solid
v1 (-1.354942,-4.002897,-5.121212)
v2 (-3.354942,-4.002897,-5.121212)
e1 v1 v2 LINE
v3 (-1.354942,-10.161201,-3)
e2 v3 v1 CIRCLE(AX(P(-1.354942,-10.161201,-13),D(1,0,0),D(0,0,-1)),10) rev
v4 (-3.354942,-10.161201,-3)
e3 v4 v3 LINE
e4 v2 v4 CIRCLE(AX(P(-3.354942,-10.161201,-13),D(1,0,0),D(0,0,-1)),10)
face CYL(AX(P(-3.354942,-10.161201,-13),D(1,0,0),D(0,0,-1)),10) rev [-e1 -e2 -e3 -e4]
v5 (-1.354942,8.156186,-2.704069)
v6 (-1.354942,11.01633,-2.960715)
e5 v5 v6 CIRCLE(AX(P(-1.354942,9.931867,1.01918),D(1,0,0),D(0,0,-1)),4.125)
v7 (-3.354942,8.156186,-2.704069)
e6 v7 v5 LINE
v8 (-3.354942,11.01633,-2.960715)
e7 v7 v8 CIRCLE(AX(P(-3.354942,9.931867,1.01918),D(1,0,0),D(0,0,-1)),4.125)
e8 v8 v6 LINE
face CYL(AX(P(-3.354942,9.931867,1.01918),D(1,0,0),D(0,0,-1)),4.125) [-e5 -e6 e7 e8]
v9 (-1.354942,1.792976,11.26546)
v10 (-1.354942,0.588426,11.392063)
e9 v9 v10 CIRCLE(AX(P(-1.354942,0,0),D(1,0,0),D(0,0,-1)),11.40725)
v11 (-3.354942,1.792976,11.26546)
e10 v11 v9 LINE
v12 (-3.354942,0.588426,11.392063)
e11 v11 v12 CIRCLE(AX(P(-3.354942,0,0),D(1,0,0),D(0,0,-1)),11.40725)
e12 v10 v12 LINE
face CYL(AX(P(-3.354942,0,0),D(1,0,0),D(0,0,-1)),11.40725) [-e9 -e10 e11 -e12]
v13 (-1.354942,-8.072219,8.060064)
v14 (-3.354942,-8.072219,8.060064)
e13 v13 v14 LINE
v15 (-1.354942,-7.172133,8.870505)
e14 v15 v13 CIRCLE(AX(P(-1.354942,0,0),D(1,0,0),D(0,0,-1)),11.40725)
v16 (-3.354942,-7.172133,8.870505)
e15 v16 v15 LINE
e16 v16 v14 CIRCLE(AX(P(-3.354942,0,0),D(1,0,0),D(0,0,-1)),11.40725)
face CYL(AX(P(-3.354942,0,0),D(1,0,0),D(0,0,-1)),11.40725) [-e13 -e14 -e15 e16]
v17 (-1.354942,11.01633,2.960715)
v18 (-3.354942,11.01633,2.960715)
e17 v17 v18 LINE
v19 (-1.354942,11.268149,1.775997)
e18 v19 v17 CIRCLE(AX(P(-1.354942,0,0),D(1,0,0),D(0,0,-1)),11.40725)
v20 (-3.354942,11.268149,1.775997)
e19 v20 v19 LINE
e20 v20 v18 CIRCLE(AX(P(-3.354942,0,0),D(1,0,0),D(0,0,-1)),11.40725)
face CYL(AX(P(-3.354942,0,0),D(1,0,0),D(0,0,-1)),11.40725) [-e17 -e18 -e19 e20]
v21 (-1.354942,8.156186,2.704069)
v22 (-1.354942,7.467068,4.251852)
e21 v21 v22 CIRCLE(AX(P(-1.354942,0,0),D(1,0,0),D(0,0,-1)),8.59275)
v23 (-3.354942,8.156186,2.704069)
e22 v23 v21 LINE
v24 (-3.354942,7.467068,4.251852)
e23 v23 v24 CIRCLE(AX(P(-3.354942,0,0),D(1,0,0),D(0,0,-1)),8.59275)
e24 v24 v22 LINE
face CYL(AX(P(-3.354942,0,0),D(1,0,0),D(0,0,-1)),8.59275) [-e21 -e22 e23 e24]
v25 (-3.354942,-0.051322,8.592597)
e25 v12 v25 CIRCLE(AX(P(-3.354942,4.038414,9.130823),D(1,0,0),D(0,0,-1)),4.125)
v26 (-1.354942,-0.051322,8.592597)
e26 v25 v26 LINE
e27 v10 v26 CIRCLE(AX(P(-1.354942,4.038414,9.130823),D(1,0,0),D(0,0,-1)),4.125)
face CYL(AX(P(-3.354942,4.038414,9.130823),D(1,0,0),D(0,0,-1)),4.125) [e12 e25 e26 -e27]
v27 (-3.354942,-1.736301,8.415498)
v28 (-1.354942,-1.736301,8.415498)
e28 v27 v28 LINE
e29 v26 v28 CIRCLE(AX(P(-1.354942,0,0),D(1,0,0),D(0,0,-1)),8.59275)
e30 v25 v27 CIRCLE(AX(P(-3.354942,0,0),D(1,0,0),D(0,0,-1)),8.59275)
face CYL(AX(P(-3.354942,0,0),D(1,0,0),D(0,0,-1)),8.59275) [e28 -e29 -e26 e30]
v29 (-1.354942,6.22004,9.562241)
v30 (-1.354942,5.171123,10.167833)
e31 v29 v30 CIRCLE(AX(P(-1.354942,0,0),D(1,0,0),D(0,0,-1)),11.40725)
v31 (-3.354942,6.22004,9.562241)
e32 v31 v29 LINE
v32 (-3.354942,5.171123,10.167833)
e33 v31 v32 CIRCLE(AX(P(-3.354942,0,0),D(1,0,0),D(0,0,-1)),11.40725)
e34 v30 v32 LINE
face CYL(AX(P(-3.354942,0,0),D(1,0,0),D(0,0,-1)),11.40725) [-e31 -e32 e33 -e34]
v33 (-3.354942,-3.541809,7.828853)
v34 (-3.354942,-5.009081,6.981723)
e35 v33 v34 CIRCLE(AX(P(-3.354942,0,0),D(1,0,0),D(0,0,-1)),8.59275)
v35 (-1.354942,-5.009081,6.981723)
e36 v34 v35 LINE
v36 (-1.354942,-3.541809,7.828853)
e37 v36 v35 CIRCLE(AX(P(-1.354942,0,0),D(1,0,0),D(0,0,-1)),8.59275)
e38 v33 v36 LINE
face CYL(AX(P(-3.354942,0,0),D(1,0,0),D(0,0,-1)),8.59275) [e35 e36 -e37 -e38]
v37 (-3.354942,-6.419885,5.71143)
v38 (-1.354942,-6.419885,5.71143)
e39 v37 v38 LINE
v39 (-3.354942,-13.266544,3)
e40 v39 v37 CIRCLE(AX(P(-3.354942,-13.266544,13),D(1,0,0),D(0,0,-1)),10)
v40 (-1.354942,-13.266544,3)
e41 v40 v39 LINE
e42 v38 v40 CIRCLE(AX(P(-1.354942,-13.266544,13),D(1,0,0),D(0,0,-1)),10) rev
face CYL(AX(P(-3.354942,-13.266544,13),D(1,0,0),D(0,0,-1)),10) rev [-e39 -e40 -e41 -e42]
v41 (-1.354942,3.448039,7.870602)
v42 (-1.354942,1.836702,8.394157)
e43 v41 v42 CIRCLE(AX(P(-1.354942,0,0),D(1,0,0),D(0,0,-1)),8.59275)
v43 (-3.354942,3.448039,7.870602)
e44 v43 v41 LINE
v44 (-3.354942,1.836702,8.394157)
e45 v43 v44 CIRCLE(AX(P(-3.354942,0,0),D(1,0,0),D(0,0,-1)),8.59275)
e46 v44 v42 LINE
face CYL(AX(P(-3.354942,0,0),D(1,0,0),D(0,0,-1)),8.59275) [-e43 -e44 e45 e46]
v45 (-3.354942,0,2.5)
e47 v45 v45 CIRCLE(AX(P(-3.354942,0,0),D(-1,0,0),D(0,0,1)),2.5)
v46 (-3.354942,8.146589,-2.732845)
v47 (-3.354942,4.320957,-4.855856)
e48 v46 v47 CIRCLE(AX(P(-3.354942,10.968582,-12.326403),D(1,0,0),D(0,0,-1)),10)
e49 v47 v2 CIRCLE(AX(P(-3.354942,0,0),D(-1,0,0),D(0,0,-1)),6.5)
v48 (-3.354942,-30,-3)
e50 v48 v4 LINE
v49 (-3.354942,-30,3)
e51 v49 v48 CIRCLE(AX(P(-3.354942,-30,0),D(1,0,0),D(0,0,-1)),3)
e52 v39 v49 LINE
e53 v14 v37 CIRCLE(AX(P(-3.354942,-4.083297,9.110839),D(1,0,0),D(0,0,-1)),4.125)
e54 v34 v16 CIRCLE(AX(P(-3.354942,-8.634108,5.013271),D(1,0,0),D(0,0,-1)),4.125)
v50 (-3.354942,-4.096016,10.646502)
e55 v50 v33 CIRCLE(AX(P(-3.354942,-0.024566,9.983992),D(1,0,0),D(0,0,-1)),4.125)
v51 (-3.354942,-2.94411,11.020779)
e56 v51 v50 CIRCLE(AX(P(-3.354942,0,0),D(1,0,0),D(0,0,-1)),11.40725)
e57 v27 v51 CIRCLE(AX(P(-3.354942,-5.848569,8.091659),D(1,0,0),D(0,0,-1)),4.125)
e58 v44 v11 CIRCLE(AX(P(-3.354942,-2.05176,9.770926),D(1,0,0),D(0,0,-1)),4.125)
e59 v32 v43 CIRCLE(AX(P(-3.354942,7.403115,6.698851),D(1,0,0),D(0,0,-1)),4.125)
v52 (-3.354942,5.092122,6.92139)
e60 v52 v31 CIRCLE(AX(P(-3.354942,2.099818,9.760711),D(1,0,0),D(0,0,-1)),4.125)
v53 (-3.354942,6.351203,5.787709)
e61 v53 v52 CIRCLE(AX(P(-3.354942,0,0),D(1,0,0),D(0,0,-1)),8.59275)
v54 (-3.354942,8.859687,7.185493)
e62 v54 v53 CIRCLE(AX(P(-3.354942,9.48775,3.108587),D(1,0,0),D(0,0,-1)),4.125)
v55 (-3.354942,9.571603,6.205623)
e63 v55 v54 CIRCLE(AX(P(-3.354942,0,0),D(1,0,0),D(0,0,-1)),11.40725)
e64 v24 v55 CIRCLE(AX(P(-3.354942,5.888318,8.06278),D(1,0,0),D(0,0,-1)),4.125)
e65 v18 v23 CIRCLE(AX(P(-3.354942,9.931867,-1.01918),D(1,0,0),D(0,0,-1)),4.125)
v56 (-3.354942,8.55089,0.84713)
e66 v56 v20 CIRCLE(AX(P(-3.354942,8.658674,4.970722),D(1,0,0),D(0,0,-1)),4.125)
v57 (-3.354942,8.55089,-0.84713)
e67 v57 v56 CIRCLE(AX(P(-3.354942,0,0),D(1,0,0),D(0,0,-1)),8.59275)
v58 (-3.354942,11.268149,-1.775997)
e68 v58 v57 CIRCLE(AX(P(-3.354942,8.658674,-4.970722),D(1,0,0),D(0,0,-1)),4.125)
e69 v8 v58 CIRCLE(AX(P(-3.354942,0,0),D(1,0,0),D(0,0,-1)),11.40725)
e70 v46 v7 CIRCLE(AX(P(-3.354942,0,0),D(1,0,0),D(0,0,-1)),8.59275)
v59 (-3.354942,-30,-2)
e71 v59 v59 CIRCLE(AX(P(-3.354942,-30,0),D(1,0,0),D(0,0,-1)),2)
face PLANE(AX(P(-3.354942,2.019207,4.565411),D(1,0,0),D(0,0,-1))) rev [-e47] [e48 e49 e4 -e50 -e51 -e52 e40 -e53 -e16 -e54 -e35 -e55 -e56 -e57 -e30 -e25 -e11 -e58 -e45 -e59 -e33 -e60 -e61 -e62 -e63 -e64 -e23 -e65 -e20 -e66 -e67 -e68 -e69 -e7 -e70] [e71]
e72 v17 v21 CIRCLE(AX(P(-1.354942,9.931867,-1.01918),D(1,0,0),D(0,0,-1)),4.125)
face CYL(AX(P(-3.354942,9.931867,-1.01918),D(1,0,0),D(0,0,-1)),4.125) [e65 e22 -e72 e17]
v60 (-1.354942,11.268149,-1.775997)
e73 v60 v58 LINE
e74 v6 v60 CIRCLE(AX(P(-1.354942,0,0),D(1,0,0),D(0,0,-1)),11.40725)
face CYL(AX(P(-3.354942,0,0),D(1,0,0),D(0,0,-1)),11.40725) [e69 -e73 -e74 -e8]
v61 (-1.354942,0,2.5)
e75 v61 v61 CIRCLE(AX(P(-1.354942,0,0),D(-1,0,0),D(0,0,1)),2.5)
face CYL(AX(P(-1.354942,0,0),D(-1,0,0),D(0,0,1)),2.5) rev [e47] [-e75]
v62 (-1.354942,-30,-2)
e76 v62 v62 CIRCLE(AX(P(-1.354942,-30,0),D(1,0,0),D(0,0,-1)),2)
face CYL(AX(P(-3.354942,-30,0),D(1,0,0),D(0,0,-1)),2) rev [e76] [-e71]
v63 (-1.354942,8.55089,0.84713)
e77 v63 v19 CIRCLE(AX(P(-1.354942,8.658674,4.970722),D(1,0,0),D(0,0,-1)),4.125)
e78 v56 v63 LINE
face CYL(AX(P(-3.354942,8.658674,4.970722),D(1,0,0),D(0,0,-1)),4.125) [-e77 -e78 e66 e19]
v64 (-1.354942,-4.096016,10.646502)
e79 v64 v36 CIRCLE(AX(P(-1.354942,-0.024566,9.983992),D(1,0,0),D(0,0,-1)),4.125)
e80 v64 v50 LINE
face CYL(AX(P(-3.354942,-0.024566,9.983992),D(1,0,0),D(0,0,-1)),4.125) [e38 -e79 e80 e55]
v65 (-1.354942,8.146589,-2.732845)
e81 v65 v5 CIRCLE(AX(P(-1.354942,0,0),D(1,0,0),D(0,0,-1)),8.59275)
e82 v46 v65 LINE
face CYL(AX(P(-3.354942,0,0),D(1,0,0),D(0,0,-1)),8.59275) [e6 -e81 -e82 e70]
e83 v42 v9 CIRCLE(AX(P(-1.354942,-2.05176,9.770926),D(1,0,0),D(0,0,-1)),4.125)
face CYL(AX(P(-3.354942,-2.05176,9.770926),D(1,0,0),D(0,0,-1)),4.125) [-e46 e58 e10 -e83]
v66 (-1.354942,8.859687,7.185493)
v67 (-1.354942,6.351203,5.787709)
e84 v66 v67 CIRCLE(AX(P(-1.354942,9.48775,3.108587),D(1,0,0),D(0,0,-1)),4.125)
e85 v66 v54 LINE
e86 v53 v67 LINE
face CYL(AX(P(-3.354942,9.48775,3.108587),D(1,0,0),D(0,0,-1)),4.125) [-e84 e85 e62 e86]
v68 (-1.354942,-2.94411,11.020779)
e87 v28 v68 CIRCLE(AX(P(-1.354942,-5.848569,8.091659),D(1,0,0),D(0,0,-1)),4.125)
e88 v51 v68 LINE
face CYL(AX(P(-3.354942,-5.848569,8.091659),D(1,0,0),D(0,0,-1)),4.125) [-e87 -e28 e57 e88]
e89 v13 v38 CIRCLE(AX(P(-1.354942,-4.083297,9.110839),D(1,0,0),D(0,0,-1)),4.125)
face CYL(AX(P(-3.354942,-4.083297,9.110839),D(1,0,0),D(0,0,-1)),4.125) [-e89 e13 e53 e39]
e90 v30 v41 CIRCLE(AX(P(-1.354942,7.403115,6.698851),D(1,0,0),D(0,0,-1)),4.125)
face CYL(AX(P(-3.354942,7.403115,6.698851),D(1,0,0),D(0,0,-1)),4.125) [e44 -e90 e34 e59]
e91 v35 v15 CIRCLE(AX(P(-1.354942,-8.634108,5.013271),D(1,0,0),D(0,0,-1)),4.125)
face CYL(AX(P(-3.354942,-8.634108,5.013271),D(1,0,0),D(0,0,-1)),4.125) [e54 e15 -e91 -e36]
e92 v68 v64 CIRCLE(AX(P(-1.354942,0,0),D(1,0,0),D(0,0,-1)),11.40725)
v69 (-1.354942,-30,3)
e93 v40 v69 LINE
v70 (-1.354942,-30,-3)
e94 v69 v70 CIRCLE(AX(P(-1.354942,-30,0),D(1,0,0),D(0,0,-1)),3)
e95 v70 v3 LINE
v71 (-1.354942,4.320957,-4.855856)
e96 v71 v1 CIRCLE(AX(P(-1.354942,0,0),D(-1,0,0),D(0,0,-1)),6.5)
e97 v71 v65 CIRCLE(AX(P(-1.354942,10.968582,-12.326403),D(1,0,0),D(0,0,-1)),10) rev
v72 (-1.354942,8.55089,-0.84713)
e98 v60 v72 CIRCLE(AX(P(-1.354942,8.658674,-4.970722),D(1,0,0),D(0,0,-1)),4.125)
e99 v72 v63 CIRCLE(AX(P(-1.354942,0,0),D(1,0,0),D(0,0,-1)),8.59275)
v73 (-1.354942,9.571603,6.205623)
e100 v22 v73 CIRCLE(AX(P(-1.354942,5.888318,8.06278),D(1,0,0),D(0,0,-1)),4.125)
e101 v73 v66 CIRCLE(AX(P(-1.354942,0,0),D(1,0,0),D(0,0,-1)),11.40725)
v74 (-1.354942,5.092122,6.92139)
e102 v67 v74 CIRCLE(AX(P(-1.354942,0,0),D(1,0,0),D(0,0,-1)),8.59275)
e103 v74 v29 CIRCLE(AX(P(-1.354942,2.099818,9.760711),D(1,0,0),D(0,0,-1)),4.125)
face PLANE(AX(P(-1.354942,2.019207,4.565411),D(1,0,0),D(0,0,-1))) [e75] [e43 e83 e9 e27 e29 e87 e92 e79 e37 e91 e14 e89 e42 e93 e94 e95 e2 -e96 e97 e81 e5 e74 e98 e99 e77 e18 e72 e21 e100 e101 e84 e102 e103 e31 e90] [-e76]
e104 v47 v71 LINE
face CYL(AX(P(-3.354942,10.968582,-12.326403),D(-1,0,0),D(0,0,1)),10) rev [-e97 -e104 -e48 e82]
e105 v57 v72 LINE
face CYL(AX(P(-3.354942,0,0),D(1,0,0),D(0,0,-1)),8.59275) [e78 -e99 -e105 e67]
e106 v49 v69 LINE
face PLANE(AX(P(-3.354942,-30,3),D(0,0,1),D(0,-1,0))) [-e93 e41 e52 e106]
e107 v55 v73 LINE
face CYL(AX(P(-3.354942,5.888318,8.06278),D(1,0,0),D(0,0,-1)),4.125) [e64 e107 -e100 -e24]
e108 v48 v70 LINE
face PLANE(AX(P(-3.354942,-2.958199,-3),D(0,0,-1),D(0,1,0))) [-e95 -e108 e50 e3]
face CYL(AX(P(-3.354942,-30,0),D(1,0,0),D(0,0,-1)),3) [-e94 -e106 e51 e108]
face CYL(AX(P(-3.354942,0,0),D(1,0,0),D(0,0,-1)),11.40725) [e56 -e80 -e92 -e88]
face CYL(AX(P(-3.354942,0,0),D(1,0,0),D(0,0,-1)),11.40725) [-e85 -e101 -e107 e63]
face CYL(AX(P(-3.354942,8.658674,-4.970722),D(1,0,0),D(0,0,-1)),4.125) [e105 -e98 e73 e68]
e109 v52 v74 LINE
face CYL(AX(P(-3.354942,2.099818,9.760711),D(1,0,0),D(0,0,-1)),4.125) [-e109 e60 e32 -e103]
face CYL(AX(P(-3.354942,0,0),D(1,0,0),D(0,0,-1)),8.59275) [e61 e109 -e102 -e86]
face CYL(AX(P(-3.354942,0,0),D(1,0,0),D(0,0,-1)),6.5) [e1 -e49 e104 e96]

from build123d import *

# Parameters (mm, degrees)
SKETCH1_R           = 1.5
BOSS_EXTRUDE1_DEPTH = 2
SKETCH3_OUTSIDE_W   = 31.914
SKETCH3_OUTSIDE_H   = 31.796
SKETCH3_OUTSIDE_R   = 11.40725
CUT_EXTRUDE1_DEPTH  = 17.630863493
SKETCH4_R           = 2.5
CUT_EXTRUDE2_DEPTH  = 17.245136509
SKETCH5_R           = 2
BOSS_EXTRUDE2_DEPTH = 2
CUT_EXTRUDE3_DEPTH  = 35.968258573
CUT_EXTRUDE4_DEPTH  = 35.968258573
FILLET1_R           = 10


with BuildPart() as part:
    # Sketch1 → Boss-Extrude1 (new body)
    with BuildSketch(Plane(origin=(-1.354941904, 0, 0), x_dir=(0, 0, -1), z_dir=(1, 0, 0))):
        with BuildLine():
            ThreePointArc((-11.66138775, 0.780827758), (-10.210393031, 0.057188521), (-8.592596732, -0.051322118))
            ThreePointArc((-8.592596732, -0.051322118), (-8.545678016, -0.898186953), (-8.415498346, -1.736300708))
            ThreePointArc((-8.415498346, -1.736300708), (-9.975381284, -2.178798893), (-11.24421523, -3.188303642))
            ThreePointArc((-11.24421523, -3.188303642), (-11.115473034, -3.611636122), (-10.97079907, -4.029792056))
            ThreePointArc((-10.97079907, -4.029792056), (-9.350918841, -4.100696673), (-7.828853128, -3.541809038))
            ThreePointArc((-7.828853128, -3.541809038), (-7.441539788, -4.296375), (-6.981723166, -5.009081172))
            ThreePointArc((-6.981723166, -5.009081172), (-8.226766912, -6.047784929), (-8.975301827, -7.486094667))
            ThreePointArc((-8.975301827, -7.486094667), (-8.685505148, -7.820463962), (-8.383259564, -8.143624213))
            ThreePointArc((-8.383259564, -8.143624213), (-6.874585833, -7.549534157), (-5.711429695, -6.419884999))
            ThreePointArc((-5.711429695, -6.419884999), (-5.050691727, -6.951680778), (-4.340744624, -7.415745996))
            ThreePointArc((-4.340744624, -7.415745996), (-5.055669804, -8.871054007), (-5.154477201, -10.489471914))
            ThreePointArc((-5.154477201, -10.489471914), (-4.753734516, -10.677062536), (-4.34617832, -10.849349762))
            ThreePointArc((-4.34617832, -10.849349762), (-3.209574481, -9.692988601), (-2.606448181, -8.187904521))
            ThreePointArc((-2.606448181, -8.187904521), (-1.786533181, -8.404977796), (-0.949211902, -8.540160966))
            ThreePointArc((-0.949211902, -8.540160966), (-1.010401457, -10.160437258), (-0.442396639, -11.679124174))
            ThreePointArc((-0.442396639, -11.679124174), (0, -11.6875), (0.442396639, -11.679124174))
            ThreePointArc((0.442396639, -11.679124174), (1.010401457, -10.160437258), (0.949211902, -8.540160966))
            ThreePointArc((0.949211902, -8.540160966), (1.786533181, -8.404977796), (2.606448181, -8.187904521))
            ThreePointArc((2.606448181, -8.187904521), (3.209574481, -9.692988601), (4.34617832, -10.849349762))
            ThreePointArc((4.34617832, -10.849349762), (4.753734516, -10.677062536), (5.154477201, -10.489471914))
            ThreePointArc((5.154477201, -10.489471914), (5.055669804, -8.871054007), (4.340744624, -7.415745996))
            ThreePointArc((4.340744624, -7.415745996), (5.050691727, -6.951680778), (5.711429695, -6.419884999))
            ThreePointArc((5.711429695, -6.419884999), (6.874585833, -7.549534157), (8.383259564, -8.143624213))
            ThreePointArc((8.383259564, -8.143624213), (8.685505148, -7.820463962), (8.975301827, -7.486094667))
            ThreePointArc((8.975301827, -7.486094667), (8.226766912, -6.047784929), (6.981723166, -5.009081172))
            ThreePointArc((6.981723166, -5.009081172), (7.441539788, -4.296375), (7.828853128, -3.541809038))
            ThreePointArc((7.828853128, -3.541809038), (9.350918841, -4.100696673), (10.97079907, -4.029792056))
            ThreePointArc((10.97079907, -4.029792056), (11.115473034, -3.611636122), (11.24421523, -3.188303642))
            ThreePointArc((11.24421523, -3.188303642), (9.975381284, -2.178798893), (8.415498346, -1.736300708))
            ThreePointArc((8.415498346, -1.736300708), (8.545678016, -0.898186953), (8.592596732, -0.051322118))
            ThreePointArc((8.592596732, -0.051322118), (10.210393031, 0.057188521), (11.66138775, 0.780827758))
            ThreePointArc((11.66138775, 0.780827758), (11.623474652, 1.221676414), (11.568901669, 1.660774047))
            ThreePointArc((11.568901669, 1.660774047), (9.999161608, 2.066921265), (8.394157409, 1.836701922))
            ThreePointArc((8.394157409, 1.836701922), (8.17219088, 2.655305778), (7.8706023, 3.448038862))
            ThreePointArc((7.8706023, 3.448038862), (9.304397507, 4.205185299), (10.335616548, 5.456435359))
            ThreePointArc((10.335616548, 5.456435359), (10.121671907, 5.84375), (9.893219909, 6.222688815))
            ThreePointArc((9.893219909, 6.222688815), (8.29399605, 5.955251959), (6.921390398, 5.092122104))
            ThreePointArc((6.921390398, 5.092122104), (6.385657699, 5.749672018), (5.787709228, 6.351202599))
            ThreePointArc((5.787709228, 6.351202599), (6.789587127, 7.626067336), (7.222723349, 9.188575716))
            ThreePointArc((7.222723349, 9.188575716), (6.869740136, 9.455386122), (6.506910549, 9.708644156))
            ThreePointArc((6.506910549, 9.708644156), (5.154723227, 8.813865487), (4.251852108, 7.467068114))
            ThreePointArc((4.251852108, 7.467068114), (3.49498629, 7.849867731), (2.704068651, 8.156185707))
            ThreePointArc((2.704068651, 8.156185707), (3.100795451, 9.728333051), (2.860955666, 11.331927856))
            ThreePointArc((2.860955666, 11.331927856), (2.429967886, 11.432100084), (1.995497243, 11.515886722))
            ThreePointArc((1.995497243, 11.515886722), (1.124151929, 10.148481601), (0.847129962, 8.55089021))
            ThreePointArc((0.847129962, 8.55089021), (0, 8.59275), (-0.847129962, 8.55089021))
            ThreePointArc((-0.847129962, 8.55089021), (-1.124151929, 10.148481601), (-1.995497243, 11.515886722))
            ThreePointArc((-1.995497243, 11.515886722), (-2.429967886, 11.432100084), (-2.860955666, 11.331927856))
            ThreePointArc((-2.860955666, 11.331927856), (-3.100795451, 9.728333051), (-2.704068651, 8.156185707))
            ThreePointArc((-2.704068651, 8.156185707), (-3.49498629, 7.849867731), (-4.251852108, 7.467068114))
            ThreePointArc((-4.251852108, 7.467068114), (-5.154723227, 8.813865487), (-6.506910549, 9.708644156))
            ThreePointArc((-6.506910549, 9.708644156), (-6.869740136, 9.455386122), (-7.222723349, 9.188575716))
            ThreePointArc((-7.222723349, 9.188575716), (-6.789587127, 7.626067336), (-5.787709228, 6.351202599))
            ThreePointArc((-5.787709228, 6.351202599), (-6.385657699, 5.749672018), (-6.921390398, 5.092122104))
            ThreePointArc((-6.921390398, 5.092122104), (-8.29399605, 5.955251959), (-9.893219909, 6.222688815))
            ThreePointArc((-9.893219909, 6.222688815), (-10.121671907, 5.84375), (-10.335616548, 5.456435359))
            ThreePointArc((-10.335616548, 5.456435359), (-9.304397507, 4.205185299), (-7.8706023, 3.448038862))
            ThreePointArc((-7.8706023, 3.448038862), (-8.17219088, 2.655305778), (-8.394157409, 1.836701922))
            ThreePointArc((-8.394157409, 1.836701922), (-9.999161608, 2.066921265), (-11.568901669, 1.660774047))
            ThreePointArc((-11.568901669, 1.660774047), (-11.623474652, 1.221676414), (-11.66138775, 0.780827758))
        make_face()
        with Locations(Location((0, 0, 0), (0, 0, 180))):
            Circle(SKETCH1_R, mode=Mode.SUBTRACT)
    extrude(amount=-BOSS_EXTRUDE1_DEPTH)

    # Sketch3 outside → Cut-Extrude1 (cut, through all)
    with BuildSketch(Plane(origin=(-1.354941904, 0, 0), x_dir=(0, 0, -1), z_dir=(1, 0, 0))):
        with Locations((0, -0.086)):
            Rectangle(SKETCH3_OUTSIDE_W, SKETCH3_OUTSIDE_H)
        Circle(SKETCH3_OUTSIDE_R, mode=Mode.SUBTRACT)
    extrude(amount=-CUT_EXTRUDE1_DEPTH, mode=Mode.SUBTRACT)

    # Sketch4 → Cut-Extrude2 (cut, through all)
    with BuildSketch(Plane.ZY.offset(3.354941904)):
        Circle(SKETCH4_R)
    extrude(amount=-CUT_EXTRUDE2_DEPTH, mode=Mode.SUBTRACT)

    # Sketch5 → Boss-Extrude2 (add)
    with BuildSketch(Plane(origin=(-1.354941904, 0, 0), x_dir=(0, 0, -1), z_dir=(1, 0, 0))):
        with BuildLine():
            Line((-3, -30), (-3, -2.958198886))
            Line((-3, -2.958198886), (3, -2.958198886))
            Line((3, -2.958198886), (3, -30))
            ThreePointArc((3, -30), (0, -33), (-3, -30))
        make_face()
        with Locations((0, -30)):
            Circle(SKETCH5_R, mode=Mode.SUBTRACT)
    extrude(amount=-BOSS_EXTRUDE2_DEPTH)

    # Sketch6 → Cut-Extrude3 (cut, through all)
    with BuildSketch(Plane(origin=(-1.354941904, 0, 0), x_dir=(0, 0, -1), z_dir=(1, 0, 0))):
        with BuildLine():
            Line((3, -11.005696369), (3, -5.766281297))
            ThreePointArc((3, -5.766281297), (6.480220208, 0.506701151), (2.067265096, 6.162500712))
            Line((2.067265096, 6.162500712), (3.627970733, 10.81495173))
            ThreePointArc((3.627970733, 10.81495173), (11.4025291, -0.328150407), (3, -11.005696369))
        make_face()
    extrude(amount=-CUT_EXTRUDE3_DEPTH, mode=Mode.SUBTRACT)

    # Sketch7 → Cut-Extrude4 (cut, through all)
    with BuildSketch(Plane(origin=(-1.354941904, 0, 0), x_dir=(0, 0, -1), z_dir=(1, 0, 0))):
        with BuildLine():
            Line((-3, -11.005696369), (-3, -8.052040273))
            ThreePointArc((-3, -8.052040273), (-3.929768687, -7.641483536), (-4.804556181, -7.124015193))
            Line((-4.804556181, -7.124015193), (-6.378257659, -9.457440552))
            ThreePointArc((-6.378257659, -9.457440552), (-4.752599625, -10.370060239), (-3, -11.005696369))
        make_face()
    extrude(amount=-CUT_EXTRUDE4_DEPTH, mode=Mode.SUBTRACT)

    # Fillet1
    # the kernel refuses this fillet: 10 mm, written as the material it adds along each edge
    with BuildSketch(Plane(origin=(-1.354941904, -8.052040273, 3), x_dir=(0, -1, 0), z_dir=(-1, 0, 0))) as fillet1_piece_1:
        with BuildLine():
            CenterArc((5.214503978, 10), FILLET1_R, 226.79066028, 43.20933972)
            Line((-1.632155274, 2.711429695), (-1.769088459, 2.565658289))
            ThreePointArc((-1.769088459, 2.565658289), (-0.861521793, 1.328359568), (-0.187414746, -0.069826307))
            Line((-0.187414746, -0.069826307), (0, -0.2))
            Line((0, -0.2), (5.214503978, -0.2))
            Line((5.214503978, -0.2), (5.214503978, 0))
        make_face()
    extrude(amount=2)
    with BuildSketch(Plane(origin=(-1.354941904, 6.162500712, -2.067265096), x_dir=(0, 0.9480770325968022, -0.3180407839608656), z_dir=(-1, 0, 0))) as fillet1_piece_2:
        with BuildLine():
            CenterArc((7.819359493, 8.197923134), FILLET1_R, 209.791407991, 25.272600943)
            Line((-0.8590402, 3.229484871), (-1.032608194, 3.130116106))
            ThreePointArc((-1.032608194, 3.130116106), (-0.411709255, 1.619480105), (-0.2, 0))
            Line((-0.2, 0), (0, -0.2))
            ThreePointArc((0, -0.2), (1.046375, -0.2), (1.97821781, -0.163958463))
            Line((1.97821781, -0.163958463), (2.09275, 0))
        make_face()
    extrude(amount=2)
    with BuildSketch(Plane(origin=(-1.354941904, -5.766281297, -3), x_dir=(0, 0.6392655253408549, -0.7689860779693485), z_dir=(-1, 0, 0))) as fillet1_piece_3:
        with BuildLine():
            CenterArc((4.880340308, 9.772287101), FILLET1_R, 219.737073353, 38.012279544)
            Line((-2.809520471, 3.379631847), (-2.963317687, 3.251778742))
            Line((-2.963317687, 3.251778742), (-0.153797216, -0.127853105))
            Line((-0.153797216, -0.127853105), (0.042437742, -0.195445742))
            ThreePointArc((0.042437742, -0.195445742), (1.379226609, -0.051986615), (2.716015476, -0.195445742))
            Line((2.716015476, -0.195445742), (2.758453218, 0))
        make_face()
    extrude(amount=2)


solid = part.part
